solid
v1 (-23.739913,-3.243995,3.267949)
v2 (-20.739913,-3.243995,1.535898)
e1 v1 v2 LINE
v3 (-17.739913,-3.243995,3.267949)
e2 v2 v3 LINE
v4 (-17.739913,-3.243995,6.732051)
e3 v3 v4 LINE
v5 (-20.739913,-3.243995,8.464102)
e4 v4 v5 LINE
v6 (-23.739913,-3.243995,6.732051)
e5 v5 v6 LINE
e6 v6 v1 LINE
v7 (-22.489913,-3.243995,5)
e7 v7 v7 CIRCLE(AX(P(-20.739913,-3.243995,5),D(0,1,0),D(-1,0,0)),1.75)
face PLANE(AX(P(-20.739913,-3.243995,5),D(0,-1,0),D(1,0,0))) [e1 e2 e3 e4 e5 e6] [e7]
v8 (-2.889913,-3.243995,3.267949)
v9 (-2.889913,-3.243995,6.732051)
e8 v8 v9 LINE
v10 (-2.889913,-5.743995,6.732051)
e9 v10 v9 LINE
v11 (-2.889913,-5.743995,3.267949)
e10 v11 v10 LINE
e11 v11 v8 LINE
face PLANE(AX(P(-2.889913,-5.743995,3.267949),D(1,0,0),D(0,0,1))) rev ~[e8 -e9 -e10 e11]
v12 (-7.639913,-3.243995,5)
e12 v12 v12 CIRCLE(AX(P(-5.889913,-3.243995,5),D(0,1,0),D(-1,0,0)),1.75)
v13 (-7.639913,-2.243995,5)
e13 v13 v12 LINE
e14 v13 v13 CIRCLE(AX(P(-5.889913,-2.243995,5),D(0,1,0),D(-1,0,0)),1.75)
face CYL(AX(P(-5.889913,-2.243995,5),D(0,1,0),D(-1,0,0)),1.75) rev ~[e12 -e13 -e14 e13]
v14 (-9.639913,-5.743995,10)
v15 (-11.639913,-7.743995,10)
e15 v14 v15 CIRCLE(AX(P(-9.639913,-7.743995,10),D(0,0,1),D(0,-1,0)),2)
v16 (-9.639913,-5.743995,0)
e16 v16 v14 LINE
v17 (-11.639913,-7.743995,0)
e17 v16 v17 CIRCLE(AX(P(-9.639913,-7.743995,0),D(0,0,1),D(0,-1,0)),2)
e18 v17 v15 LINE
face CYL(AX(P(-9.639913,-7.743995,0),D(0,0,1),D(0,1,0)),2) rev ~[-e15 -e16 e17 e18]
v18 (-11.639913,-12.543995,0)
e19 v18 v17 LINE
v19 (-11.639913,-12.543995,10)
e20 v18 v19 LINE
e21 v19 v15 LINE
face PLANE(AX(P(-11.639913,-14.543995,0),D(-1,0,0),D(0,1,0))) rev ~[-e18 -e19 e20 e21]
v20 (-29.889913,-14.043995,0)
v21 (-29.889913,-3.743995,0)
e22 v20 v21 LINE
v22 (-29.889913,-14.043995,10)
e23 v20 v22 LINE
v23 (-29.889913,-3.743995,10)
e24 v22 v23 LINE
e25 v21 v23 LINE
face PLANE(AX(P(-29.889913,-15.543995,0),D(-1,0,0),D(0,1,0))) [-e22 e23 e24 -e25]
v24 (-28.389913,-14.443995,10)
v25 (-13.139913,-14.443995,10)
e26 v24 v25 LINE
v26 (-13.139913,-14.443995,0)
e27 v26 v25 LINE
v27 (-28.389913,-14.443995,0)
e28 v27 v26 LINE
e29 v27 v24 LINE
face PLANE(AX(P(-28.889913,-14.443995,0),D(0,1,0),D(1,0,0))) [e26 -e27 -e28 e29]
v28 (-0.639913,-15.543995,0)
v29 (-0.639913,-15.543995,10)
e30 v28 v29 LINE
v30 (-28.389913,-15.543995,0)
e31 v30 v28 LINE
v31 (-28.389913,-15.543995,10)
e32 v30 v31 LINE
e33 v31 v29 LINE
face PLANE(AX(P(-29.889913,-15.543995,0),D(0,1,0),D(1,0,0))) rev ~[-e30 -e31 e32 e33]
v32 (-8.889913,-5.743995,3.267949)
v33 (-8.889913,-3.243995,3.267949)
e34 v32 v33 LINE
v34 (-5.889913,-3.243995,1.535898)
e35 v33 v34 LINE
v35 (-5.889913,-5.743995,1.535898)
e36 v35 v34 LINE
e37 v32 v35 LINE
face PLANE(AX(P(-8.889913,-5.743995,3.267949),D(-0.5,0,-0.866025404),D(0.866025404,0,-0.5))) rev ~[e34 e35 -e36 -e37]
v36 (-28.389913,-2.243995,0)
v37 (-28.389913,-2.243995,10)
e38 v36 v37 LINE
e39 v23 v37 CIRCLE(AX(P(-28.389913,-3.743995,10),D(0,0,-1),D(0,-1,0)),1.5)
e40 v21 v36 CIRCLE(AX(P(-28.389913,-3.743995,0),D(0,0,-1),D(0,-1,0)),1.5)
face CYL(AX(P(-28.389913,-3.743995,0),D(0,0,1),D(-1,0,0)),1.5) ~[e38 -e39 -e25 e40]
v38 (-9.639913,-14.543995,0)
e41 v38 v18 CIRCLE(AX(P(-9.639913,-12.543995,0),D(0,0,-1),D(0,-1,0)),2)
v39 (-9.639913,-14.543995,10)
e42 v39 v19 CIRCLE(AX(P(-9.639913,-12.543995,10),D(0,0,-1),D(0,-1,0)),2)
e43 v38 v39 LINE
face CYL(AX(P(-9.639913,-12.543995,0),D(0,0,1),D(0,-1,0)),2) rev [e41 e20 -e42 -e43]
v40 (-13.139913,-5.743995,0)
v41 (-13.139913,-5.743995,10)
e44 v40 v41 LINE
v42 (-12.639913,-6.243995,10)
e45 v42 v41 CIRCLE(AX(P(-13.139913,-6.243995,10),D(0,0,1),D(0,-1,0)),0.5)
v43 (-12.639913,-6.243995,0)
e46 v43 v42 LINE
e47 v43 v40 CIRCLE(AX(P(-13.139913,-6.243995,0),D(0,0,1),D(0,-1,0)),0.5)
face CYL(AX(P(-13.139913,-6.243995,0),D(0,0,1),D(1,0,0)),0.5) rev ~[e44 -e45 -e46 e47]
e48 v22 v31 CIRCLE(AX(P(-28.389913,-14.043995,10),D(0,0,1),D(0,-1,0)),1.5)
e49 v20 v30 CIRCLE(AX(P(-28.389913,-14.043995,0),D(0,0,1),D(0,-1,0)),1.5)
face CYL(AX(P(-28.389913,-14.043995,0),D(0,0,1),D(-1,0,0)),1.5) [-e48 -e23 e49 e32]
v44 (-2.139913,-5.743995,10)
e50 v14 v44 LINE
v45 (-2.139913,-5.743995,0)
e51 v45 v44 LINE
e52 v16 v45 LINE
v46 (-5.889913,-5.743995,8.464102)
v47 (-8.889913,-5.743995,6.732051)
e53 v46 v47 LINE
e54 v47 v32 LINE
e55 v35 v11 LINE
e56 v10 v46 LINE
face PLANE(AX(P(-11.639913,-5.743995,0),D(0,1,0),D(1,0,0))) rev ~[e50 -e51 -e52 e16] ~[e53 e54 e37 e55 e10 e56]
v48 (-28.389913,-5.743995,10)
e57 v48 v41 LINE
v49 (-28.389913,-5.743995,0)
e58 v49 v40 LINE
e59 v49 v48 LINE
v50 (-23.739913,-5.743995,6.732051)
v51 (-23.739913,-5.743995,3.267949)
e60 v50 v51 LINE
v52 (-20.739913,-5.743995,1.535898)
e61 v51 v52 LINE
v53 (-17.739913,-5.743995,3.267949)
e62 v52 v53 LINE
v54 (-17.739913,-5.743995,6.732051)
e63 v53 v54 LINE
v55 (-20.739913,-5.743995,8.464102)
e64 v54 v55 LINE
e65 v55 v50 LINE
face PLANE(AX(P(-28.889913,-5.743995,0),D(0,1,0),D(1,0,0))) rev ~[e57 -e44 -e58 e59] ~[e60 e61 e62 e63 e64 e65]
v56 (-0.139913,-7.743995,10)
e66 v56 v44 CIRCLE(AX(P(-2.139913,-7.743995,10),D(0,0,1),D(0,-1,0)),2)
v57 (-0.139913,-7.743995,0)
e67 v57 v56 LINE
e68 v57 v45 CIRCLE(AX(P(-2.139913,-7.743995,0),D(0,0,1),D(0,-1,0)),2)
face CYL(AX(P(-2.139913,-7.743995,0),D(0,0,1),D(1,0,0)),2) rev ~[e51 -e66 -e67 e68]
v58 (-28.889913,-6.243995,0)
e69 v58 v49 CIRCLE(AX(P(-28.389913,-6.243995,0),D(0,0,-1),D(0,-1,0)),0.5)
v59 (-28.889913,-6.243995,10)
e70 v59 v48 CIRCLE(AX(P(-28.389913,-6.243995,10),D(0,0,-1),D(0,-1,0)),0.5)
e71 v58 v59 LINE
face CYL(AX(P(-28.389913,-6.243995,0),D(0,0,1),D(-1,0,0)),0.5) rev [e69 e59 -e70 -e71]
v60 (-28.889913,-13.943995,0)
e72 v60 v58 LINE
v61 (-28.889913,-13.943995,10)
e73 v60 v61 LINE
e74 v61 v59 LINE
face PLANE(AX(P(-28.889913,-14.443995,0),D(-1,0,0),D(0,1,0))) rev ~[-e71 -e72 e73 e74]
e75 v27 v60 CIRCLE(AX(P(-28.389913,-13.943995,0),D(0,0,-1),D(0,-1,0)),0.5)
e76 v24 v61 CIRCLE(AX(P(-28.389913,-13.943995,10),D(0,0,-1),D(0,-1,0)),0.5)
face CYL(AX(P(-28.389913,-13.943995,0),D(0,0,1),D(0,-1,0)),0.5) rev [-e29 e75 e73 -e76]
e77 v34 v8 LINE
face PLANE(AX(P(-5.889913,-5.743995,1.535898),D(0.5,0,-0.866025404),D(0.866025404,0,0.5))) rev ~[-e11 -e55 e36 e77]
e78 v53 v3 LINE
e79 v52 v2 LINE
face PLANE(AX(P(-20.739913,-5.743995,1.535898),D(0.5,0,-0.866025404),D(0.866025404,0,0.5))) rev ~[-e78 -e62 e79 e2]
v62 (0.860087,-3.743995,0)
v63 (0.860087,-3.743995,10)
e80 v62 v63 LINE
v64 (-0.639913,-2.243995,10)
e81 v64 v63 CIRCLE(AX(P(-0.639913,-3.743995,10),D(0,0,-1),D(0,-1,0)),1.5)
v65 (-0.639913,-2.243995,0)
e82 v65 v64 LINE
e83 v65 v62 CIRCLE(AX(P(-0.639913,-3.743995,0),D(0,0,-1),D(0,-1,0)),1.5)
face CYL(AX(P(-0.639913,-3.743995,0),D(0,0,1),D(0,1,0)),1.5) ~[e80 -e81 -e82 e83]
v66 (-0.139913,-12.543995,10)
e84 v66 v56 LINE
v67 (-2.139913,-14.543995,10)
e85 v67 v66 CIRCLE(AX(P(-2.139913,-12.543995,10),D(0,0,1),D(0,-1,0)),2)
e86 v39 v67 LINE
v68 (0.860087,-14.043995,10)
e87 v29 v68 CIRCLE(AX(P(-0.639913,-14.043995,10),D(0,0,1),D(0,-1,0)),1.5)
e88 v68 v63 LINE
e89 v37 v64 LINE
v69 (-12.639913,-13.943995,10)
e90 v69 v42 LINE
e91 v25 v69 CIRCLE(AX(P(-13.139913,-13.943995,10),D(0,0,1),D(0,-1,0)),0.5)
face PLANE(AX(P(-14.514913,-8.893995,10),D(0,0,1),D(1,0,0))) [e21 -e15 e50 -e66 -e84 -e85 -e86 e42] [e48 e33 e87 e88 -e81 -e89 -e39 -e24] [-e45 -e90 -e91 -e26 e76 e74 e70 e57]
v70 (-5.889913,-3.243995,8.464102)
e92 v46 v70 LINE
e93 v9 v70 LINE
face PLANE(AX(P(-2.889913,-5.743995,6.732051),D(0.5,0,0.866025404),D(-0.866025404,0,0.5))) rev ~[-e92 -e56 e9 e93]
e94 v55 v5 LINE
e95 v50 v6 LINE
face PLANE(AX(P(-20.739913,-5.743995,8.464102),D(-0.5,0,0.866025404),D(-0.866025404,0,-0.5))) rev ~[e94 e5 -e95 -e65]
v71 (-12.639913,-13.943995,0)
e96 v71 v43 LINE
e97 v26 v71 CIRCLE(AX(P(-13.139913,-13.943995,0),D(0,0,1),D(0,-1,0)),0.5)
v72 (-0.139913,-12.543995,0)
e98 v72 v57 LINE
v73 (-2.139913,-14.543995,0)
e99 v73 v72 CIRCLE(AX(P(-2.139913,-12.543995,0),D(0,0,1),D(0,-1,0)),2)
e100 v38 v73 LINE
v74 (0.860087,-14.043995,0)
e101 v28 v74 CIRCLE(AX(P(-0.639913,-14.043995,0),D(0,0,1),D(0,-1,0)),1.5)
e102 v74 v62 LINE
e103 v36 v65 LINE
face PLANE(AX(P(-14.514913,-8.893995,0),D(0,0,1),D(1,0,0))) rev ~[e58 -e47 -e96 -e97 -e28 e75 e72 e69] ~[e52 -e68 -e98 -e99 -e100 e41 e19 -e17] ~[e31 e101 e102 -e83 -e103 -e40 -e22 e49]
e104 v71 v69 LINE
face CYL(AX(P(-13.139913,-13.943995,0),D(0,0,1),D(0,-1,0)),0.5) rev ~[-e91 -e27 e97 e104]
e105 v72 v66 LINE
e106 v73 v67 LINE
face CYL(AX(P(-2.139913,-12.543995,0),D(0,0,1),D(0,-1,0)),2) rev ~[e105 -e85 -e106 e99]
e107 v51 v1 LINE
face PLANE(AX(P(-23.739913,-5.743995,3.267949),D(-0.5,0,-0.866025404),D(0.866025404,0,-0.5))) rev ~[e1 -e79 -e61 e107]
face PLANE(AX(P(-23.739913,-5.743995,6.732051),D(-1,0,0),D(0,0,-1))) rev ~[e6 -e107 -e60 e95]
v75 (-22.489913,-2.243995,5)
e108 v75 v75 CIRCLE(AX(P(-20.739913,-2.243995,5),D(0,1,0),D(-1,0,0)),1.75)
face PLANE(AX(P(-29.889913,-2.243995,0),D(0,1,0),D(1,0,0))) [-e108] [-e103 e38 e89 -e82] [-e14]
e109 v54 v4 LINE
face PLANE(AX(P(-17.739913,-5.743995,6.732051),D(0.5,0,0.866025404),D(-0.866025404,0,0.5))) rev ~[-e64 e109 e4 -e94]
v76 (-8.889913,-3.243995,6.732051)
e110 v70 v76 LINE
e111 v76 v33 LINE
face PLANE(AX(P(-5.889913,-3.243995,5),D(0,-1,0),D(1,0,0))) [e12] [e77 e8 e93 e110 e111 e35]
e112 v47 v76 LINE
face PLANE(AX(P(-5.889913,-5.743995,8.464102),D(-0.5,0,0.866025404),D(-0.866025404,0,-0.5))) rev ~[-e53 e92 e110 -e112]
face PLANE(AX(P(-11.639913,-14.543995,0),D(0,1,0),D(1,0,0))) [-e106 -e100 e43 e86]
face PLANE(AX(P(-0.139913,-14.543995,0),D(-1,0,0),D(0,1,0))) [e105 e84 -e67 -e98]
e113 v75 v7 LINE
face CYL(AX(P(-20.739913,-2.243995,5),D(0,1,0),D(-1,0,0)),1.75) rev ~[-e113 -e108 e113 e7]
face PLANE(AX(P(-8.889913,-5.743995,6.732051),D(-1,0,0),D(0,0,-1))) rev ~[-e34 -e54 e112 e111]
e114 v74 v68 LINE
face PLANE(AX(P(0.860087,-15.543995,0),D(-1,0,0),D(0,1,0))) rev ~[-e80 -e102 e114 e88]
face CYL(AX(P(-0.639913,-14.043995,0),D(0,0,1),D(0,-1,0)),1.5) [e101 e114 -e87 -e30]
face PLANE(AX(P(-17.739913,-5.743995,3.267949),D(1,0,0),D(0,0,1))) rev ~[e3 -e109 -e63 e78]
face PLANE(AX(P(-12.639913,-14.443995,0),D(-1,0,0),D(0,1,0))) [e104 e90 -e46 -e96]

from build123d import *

# Parameters (mm, degrees)
F0_W     = 30.75
F0_H     = 13.3
F0_W_2   = 16.25
F0_H_2   = 8.7
F0_W_3   = 11.5
F0_H_3   = 8.8
F1_DEPTH = 10
F2_R     = 0.5
F3_R     = 2
F4_R     = 1.5
F7_DEPTH = 2.5
F5_R     = 1.75
F8_DEPTH = 8


with BuildPart() as f1:
    # F0 (on Top) → F1 (new body)
    with BuildSketch(Plane.XY):
        with Locations((-14.5149128214, -8.8939947993)):
            Rectangle(F0_W, F0_H)
        with Locations((-20.7649128214, -10.0939947993)):
            Rectangle(F0_W_2, F0_H_2, mode=Mode.SUBTRACT)
        with Locations((-5.8899128214, -10.1439947993)):
            Rectangle(F0_W_3, F0_H_3, mode=Mode.SUBTRACT)
    extrude(amount=F1_DEPTH)

    # F2
    f2_edges = [f1.edges().sort_by_distance(p)[0] for p in [
        (-28.889913, -5.743995, 5),
        (-28.889913, -14.443995, 5),
        (-12.639913, -5.743995, 5),
        (-12.639913, -14.443995, 5),
    ]]
    fillet(f2_edges, radius=F2_R)

    # F3
    f3_edges = [f1.edges().sort_by_distance(p)[0] for p in [
        (-0.139913, -5.743995, 5),
        (-0.139913, -14.543995, 5),
        (-11.639913, -14.543995, 5),
        (-11.639913, -5.743995, 5),
    ]]
    fillet(f3_edges, radius=F3_R)

    # F4
    f4_edges = [f1.edges().sort_by_distance(p)[0] for p in [
        (-29.889913, -15.543995, 5),
        (-29.889913, -2.243995, 5),
        (0.860087, -15.543995, 5),
        (0.860087, -2.243995, 5),
    ]]
    fillet(f4_edges, radius=F4_R)

    # F6 (on face) → F7 (cut)
    with BuildSketch(Plane.XZ.offset(5.7439947993)):
        Polygon((-8.8899128214, 6.7320508076), (-8.8899128214, 3.2679491924), (-5.8899128214, 1.5358983849), (-2.8899128214, 3.2679491924), (-2.8899128214, 6.7320508076), (-5.8899128214, 8.4641016151), align=None)
        Polygon((-23.7399128214, 6.7320508076), (-23.7399128214, 3.2679491924), (-20.7399128214, 1.5358983849), (-17.7399128214, 3.2679491924), (-17.7399128214, 6.7320508076), (-20.7399128214, 8.4641016151), align=None)
    extrude(amount=-F7_DEPTH, mode=Mode.SUBTRACT)

    # F5 (on face) → F8 (cut)
    with BuildSketch(Plane(origin=(0, -2.2439947993, 0), x_dir=(-1, 0, 0), z_dir=(0, 1, 0))):
        with Locations((5.8899128214, 5)):
            Circle(F5_R)
        with Locations((20.7399128214, 5)):
            Circle(F5_R)
    extrude(amount=-F8_DEPTH, mode=Mode.SUBTRACT)


solid = f1.part
